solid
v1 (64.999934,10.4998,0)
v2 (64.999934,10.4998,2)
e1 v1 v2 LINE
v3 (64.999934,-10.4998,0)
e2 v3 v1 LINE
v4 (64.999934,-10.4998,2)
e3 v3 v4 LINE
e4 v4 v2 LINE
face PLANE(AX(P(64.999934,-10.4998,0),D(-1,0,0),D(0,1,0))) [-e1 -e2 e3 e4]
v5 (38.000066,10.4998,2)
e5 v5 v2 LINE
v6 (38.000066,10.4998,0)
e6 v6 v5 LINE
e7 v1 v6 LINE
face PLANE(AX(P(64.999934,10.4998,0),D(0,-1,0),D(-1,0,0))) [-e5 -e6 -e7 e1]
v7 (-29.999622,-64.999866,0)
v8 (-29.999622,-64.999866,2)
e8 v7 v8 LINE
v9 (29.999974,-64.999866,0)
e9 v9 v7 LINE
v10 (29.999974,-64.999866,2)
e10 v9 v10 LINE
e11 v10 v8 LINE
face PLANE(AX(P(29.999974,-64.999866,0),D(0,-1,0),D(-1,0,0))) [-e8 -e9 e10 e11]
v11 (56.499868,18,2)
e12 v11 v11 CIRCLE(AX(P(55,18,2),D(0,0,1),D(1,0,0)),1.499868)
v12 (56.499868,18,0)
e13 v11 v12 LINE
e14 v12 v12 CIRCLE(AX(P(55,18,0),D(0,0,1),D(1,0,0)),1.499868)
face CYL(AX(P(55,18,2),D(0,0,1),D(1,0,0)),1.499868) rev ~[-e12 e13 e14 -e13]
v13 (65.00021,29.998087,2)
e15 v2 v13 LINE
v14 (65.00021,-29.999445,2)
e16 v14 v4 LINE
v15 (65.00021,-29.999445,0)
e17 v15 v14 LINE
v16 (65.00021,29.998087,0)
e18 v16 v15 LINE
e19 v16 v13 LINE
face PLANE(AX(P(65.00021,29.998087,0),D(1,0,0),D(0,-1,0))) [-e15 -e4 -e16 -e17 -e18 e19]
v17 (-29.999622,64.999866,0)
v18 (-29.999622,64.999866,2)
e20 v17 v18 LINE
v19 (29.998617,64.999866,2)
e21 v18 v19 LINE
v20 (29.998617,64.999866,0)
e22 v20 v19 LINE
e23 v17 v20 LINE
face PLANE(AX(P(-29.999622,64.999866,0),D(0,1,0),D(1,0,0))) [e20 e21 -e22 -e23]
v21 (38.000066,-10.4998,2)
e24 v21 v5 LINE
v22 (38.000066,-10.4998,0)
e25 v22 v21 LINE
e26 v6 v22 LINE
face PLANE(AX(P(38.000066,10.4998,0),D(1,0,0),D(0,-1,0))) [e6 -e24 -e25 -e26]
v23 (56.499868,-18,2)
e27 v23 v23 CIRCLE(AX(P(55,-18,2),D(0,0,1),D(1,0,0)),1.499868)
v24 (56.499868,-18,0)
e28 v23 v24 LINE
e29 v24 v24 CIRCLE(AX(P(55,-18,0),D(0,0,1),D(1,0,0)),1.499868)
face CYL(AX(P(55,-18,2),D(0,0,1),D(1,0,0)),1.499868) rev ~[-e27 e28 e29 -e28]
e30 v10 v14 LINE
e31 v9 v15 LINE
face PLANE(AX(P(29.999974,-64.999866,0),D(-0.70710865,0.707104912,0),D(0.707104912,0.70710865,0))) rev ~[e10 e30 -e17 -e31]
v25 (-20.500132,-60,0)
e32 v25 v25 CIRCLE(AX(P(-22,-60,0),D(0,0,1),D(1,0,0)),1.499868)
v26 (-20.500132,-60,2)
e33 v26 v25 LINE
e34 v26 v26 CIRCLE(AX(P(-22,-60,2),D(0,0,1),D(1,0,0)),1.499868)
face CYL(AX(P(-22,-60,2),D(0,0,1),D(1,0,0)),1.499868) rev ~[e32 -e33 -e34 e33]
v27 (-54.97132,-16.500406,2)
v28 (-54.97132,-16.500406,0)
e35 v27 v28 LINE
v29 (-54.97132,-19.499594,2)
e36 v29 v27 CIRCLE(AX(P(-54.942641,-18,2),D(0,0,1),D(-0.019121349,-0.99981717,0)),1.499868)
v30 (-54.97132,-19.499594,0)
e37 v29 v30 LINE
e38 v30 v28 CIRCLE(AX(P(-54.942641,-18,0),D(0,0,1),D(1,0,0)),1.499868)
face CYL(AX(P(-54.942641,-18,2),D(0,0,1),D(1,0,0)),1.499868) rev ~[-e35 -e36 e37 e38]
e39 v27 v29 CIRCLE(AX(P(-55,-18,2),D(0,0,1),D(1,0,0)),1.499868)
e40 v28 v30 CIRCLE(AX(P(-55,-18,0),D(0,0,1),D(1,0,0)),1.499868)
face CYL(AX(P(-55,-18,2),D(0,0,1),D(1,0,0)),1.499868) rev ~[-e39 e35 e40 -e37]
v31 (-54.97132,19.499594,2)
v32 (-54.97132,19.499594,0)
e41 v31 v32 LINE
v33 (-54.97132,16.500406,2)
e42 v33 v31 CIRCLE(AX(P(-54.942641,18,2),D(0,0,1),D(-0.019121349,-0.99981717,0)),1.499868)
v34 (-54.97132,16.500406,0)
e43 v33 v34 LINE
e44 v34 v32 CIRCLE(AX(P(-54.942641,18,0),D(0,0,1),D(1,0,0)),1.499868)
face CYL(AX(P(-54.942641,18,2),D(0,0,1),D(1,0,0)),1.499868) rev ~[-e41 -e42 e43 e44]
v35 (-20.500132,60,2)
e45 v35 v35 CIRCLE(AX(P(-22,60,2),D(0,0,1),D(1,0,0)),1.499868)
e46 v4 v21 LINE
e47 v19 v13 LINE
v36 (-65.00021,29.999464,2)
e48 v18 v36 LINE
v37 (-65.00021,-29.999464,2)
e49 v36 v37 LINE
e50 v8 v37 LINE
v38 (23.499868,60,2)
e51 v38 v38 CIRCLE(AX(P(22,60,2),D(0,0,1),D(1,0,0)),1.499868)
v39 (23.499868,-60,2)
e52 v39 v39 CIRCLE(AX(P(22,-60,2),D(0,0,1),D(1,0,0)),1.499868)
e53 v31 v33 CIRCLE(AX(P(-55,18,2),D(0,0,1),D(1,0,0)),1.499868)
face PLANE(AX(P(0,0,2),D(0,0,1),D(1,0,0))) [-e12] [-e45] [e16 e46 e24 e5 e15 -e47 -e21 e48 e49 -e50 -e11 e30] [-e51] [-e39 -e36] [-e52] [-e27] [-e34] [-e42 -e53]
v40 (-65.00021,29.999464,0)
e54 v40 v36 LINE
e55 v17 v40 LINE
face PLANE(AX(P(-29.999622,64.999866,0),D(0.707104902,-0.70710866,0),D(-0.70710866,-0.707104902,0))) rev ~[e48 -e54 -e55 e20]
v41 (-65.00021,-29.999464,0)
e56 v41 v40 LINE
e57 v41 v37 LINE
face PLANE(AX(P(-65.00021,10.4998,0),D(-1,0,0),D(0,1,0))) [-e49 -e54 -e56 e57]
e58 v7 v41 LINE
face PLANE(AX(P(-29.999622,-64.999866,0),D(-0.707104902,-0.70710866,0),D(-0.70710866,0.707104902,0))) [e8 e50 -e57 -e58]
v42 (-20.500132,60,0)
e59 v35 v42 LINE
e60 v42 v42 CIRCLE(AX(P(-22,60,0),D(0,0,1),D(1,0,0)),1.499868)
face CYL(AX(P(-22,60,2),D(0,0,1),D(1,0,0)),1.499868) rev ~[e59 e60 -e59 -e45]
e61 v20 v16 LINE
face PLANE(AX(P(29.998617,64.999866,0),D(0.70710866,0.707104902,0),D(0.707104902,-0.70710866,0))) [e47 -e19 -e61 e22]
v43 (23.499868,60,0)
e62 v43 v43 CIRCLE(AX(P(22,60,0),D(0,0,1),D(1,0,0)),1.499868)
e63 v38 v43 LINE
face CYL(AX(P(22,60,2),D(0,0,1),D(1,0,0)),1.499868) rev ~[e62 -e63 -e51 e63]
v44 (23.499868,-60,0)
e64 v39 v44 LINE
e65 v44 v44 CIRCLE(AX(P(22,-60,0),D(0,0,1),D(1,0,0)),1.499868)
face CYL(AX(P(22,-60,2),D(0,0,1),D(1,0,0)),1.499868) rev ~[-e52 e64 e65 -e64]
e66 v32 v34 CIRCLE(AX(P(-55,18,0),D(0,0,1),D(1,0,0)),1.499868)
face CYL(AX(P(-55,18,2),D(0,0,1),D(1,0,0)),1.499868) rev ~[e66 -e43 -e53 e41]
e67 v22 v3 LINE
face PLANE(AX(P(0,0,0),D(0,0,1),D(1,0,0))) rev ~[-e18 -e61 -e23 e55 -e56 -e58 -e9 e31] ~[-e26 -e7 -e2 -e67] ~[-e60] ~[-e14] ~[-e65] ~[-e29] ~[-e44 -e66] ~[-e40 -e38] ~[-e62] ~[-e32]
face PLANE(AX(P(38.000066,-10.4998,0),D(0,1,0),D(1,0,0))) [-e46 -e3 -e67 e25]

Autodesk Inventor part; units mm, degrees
ref_plane "YZ Plane" through (0, 0, 0) normal (1, 0, 0) x (0, 1, 0)
ref_plane "XZ Plane" through (0, 0, 0) normal (0, 1, 0) x (-1, 0, 0)
ref_plane "XY Plane" through (0, 0, 0) normal (0, 0, 1) x (1, 0, 0)
sketch "Sketch1" plane through (0, 0, 0) normal (0, 0, 1) x (1, 0, 0)
  line L0 (-65.00021, 64.999866) -> (65.00021, 64.999866)
  line L1 (65.00021, 64.999866) -> (65.00021, -64.999866)
  line L2 (65.00021, -64.999866) -> (-65.00021, -64.999866)
  line L3 (-65.00021, -64.999866) -> (-65.00021, 64.999866)
  line L4 (-65.00021, 64.999866) -> (65.00021, -64.999866) construction
  line L5 (65.00021, 64.999866) -> (-65.00021, -64.999866) construction
  line L6 (29.999974, -64.999866) -> (65.00021, -29.999445)
  line L7 (-29.999622, -64.999866) -> (-65.00021, -29.999464)
  line L8 (-29.999622, 64.999866) -> (-65.00021, 29.999464)
  line L9 (29.998617, 64.999866) -> (65.00021, 29.998087)
  line L10 (-13.50021, 64.999866) -> (116.50021, -64.999866) construction
  line L11 (64.999934, -10.4998) -> (38.000066, -10.4998)
  line L12 (38.000066, -10.4998) -> (38.000066, 10.4998)
  line L13 (38.000066, 10.4998) -> (64.999934, 10.4998)
  line L14 (64.999934, 10.4998) -> (64.999934, -10.4998)
  line L15 (64.999934, -10.4998) -> (38.000066, 10.4998) construction
  line L16 (38.000066, -10.4998) -> (64.999934, 10.4998) construction
  line L17 (-38.000066, -10.4998) -> (-64.999934, -10.4998)
  line L18 (-64.999934, -10.4998) -> (-64.999934, 10.4998)
  line L19 (-64.999934, 10.4998) -> (-38.000066, 10.4998)
  line L20 (-38.000066, 10.4998) -> (-38.000066, -10.4998)
  line L21 (-38.000066, -10.4998) -> (-64.999934, 10.4998) construction
  line L22 (-64.999934, -10.4998) -> (-38.000066, 10.4998) construction
  line L23 (16.970375, 2.121415) -> (-2.121415, -16.970375)
  line L24 (-2.121415, -16.970375) -> (-16.970375, -2.121415)
  line L25 (-16.970375, -2.121415) -> (2.121415, 16.970375)
  line L26 (2.121415, 16.970375) -> (16.970375, 2.121415)
  line L27 (-2.121415, -16.970375) -> (2.121415, 16.970375) construction
extrude "Extrusion1" add sketch "Sketch1" along normal blind 2 contours L0 L9 L1 L13 L12 L11 L6 L2 L7 L3 L17 L20 L19 L8 | L19 L20 L17 L3 | L1 L11 L12 L13 | L23 L24 L25 L26
sketch "Sketch2" plane through (0, 0, 2) normal (0, 0, 1) x (1, 0, 0)
  circle A0 centre (22, 60) radius 1.499868
  circle A1 centre (-22, 60) radius 1.499868
  circle A2 centre (22, -60) radius 1.499868
  circle A3 centre (-22, -60) radius 1.499868
  circle A4 centre (55, 18) radius 1.499868
  circle A5 centre (55, -18) radius 1.499868
  circle A6 centre (-55, 18) radius 1.499868
  circle A7 centre (-54.942641, 18) radius 1.499868
  circle A8 centre (-55, -18) radius 1.499868
  circle A9 centre (-54.942641, -18) radius 1.499868
  point P0 (-54.971321, 16.500406)
  point P1 (-54.971321, 19.499594)
  point P2 (-54.971321, -19.499594)
  point P3 (-54.971321, -16.500406)
extrude "Extrusion2" cut sketch "Sketch2" against normal blind 10
sketch "Sketch1 outline for Extrusion3" plane through (0, 0, 0) normal (0, 0, 1) x (1, 0, 0)
  line L0 (64.999934, -10.4998) -> (64.999934, 10.4998)
  line L1 (38.000066, -10.4998) -> (64.999934, -10.4998)
  line L2 (38.000066, 10.4998) -> (38.000066, -10.4998)
  line L3 (64.999934, 10.4998) -> (38.000066, 10.4998)
extrude "Extrusion3" cut sketch "Sketch1 outline for Extrusion3" along normal blind 10
properties part number "t960_power_distribution_board_TL2996_bottom"
